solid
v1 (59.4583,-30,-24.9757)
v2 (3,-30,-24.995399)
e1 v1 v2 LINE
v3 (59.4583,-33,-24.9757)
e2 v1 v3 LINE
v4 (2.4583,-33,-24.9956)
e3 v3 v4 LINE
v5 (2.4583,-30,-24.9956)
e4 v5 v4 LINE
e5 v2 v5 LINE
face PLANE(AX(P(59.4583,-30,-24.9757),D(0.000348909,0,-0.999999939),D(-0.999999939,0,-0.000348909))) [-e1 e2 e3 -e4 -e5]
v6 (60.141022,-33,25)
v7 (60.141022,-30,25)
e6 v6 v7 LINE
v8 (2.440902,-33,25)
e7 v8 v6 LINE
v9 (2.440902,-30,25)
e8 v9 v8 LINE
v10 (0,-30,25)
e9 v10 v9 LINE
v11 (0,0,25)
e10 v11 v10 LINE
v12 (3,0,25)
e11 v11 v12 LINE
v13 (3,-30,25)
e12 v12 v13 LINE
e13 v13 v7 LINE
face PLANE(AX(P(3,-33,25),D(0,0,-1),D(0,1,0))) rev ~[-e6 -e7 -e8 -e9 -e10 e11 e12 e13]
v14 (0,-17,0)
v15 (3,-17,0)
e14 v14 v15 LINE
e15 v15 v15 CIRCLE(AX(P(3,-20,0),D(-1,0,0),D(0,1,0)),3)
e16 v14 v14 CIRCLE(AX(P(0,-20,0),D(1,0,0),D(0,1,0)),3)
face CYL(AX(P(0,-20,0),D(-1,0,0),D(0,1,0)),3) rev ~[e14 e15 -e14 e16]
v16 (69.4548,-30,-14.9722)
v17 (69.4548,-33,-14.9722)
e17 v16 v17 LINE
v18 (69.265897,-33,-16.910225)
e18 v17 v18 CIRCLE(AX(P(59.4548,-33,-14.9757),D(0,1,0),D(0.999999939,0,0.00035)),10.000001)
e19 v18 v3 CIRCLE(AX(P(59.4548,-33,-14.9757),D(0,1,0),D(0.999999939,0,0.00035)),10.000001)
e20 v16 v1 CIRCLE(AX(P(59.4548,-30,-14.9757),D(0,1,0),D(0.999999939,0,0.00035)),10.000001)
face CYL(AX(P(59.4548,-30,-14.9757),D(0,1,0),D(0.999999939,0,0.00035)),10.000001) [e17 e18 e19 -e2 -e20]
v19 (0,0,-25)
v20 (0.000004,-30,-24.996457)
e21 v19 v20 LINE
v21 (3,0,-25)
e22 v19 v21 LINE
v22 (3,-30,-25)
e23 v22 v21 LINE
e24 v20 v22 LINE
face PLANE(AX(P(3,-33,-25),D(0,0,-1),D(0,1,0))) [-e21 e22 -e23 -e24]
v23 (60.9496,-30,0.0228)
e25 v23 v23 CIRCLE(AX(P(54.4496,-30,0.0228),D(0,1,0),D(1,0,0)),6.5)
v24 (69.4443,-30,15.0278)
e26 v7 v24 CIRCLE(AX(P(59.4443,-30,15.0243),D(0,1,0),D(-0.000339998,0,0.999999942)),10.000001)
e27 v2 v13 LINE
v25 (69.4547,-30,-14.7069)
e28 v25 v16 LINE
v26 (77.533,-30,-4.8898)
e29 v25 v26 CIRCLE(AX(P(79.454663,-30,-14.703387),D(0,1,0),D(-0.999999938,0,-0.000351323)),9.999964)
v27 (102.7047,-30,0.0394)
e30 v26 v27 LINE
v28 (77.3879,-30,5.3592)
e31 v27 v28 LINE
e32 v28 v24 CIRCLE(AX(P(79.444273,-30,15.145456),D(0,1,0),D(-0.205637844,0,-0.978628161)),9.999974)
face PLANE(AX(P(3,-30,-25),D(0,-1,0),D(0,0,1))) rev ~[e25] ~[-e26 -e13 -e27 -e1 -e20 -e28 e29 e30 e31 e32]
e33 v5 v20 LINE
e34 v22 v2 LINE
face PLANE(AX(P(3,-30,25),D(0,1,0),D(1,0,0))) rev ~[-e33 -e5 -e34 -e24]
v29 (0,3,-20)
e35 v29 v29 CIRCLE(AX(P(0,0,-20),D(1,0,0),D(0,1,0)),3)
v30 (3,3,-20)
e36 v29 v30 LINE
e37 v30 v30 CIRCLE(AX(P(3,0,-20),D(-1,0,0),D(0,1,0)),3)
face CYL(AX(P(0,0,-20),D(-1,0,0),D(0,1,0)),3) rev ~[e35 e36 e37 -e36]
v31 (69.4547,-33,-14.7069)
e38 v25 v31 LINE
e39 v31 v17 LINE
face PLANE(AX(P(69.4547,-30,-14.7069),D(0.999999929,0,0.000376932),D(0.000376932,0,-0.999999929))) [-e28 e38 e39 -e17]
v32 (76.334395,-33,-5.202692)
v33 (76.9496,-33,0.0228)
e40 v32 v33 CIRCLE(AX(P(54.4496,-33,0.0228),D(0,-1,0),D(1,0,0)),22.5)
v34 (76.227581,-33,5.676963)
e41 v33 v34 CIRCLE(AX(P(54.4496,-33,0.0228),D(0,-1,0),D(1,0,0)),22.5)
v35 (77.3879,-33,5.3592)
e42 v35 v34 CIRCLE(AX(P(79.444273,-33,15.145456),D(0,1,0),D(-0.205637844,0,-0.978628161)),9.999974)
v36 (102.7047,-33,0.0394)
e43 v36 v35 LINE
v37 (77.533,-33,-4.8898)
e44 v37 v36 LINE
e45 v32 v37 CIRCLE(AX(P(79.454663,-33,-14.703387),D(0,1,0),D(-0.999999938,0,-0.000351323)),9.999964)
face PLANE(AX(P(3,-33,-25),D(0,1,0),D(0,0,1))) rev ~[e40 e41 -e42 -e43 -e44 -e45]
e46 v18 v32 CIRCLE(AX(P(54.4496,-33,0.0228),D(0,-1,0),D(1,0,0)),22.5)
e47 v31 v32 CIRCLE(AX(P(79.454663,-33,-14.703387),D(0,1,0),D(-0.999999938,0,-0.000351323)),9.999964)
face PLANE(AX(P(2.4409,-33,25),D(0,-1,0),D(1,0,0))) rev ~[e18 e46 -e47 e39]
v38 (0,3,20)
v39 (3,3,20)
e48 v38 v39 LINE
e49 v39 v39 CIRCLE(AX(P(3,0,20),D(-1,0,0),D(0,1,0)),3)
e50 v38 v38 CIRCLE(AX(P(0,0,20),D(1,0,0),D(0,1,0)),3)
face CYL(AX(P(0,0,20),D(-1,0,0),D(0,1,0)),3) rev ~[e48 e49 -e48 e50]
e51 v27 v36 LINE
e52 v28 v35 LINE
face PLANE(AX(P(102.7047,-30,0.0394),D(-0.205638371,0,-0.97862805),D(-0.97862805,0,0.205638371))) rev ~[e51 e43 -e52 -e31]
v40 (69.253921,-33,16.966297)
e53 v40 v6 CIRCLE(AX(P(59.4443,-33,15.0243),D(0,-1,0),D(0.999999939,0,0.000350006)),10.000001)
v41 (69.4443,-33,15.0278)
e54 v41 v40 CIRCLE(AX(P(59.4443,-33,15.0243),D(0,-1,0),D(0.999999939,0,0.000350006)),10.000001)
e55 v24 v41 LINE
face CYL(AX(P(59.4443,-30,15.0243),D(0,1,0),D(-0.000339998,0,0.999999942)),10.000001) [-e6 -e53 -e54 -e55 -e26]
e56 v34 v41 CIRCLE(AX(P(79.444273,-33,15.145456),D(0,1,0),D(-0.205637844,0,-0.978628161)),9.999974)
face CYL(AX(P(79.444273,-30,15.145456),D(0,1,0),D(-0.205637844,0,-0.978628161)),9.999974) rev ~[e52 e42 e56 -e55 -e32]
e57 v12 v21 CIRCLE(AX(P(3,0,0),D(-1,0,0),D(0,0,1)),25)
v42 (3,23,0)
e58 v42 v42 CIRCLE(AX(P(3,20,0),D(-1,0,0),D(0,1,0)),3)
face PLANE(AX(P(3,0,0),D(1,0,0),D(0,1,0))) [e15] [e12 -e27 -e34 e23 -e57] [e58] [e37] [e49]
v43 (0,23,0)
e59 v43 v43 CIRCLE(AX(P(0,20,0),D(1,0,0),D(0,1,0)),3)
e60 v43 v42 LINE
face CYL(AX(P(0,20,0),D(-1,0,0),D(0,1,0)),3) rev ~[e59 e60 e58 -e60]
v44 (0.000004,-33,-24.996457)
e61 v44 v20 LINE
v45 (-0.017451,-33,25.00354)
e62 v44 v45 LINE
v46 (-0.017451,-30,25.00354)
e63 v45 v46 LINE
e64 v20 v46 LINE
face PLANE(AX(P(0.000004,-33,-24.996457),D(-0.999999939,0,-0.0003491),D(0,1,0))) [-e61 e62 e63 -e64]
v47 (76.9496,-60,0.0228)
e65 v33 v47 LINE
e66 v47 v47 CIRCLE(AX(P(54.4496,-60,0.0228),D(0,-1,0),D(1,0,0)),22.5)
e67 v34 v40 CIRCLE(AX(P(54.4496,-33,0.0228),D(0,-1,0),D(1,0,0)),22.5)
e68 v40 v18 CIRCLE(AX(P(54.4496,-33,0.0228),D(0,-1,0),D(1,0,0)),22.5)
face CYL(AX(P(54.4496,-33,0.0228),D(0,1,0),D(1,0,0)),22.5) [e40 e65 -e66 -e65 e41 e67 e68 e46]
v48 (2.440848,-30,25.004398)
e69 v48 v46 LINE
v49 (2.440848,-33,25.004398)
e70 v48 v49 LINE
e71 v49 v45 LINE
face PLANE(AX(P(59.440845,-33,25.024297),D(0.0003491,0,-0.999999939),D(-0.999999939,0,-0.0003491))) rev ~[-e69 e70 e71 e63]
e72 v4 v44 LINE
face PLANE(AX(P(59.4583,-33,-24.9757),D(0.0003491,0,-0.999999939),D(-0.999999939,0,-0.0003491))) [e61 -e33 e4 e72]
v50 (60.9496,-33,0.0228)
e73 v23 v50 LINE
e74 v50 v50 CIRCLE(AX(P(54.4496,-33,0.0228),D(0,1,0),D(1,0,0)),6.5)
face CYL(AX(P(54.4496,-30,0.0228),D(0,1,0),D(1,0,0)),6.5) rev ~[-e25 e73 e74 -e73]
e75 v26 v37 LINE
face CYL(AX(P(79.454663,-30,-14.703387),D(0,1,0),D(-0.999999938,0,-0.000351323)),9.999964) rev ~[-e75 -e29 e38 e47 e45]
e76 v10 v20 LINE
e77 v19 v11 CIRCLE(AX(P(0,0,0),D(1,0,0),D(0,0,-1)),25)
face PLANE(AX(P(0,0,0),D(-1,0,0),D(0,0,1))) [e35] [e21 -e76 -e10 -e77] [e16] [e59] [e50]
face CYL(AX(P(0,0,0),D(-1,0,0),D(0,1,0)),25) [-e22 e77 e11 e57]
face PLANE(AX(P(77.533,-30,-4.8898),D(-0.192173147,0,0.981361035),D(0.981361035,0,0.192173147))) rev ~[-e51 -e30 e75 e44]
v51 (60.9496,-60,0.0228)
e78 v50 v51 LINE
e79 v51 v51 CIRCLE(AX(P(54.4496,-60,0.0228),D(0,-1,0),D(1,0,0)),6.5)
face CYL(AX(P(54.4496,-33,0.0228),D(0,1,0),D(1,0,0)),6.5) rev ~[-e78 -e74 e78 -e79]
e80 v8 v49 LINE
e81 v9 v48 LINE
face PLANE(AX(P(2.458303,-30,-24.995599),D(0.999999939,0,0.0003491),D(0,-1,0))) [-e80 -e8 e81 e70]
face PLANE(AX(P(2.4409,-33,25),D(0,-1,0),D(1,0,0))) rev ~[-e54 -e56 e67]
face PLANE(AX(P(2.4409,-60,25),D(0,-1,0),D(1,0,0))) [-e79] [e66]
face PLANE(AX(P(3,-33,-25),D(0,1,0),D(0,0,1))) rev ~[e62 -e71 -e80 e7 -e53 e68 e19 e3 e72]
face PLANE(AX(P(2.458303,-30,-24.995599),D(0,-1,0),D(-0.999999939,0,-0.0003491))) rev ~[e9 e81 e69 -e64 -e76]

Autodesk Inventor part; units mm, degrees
ref_plane "YZ Plane" through (0, 0, 0) normal (1, 0, 0) x (0, 1, 0)
ref_plane "XZ Plane" through (0, 0, 0) normal (0, 1, 0) x (-1, 0, 0)
ref_plane "XY Plane" through (0, 0, 0) normal (0, 0, 1) x (1, 0, 0)
sketch "Boceto1" plane through (0, 0, 0) normal (1, 0, 0) x (0, 1, 0)
  circle A0 centre (0, 0) radius 25
  circle A1 centre (0, 0) radius 20
  circle A2 centre (20, 0) radius 3
  circle A3 centre (0, 20) radius 3
  circle A4 centre (-20, 0) radius 3
  circle A5 centre (0, -20) radius 3
  line L0 (0, 25) -> (-31.5, 25)
  line L1 (-31.5, 25) -> (-31.5, -25)
  line L2 (-31.5, -25) -> (0, -25)
  line L3 (0, -25) -> (0, 25)
  point P0 (0, -25)
  dimension "d1" = 40
  dimension "d0" = 50
  dimension "d2" = 6
  dimension "d5" = 360
  dimension "d7" = 31.5
  dimension "d8" = 0
  dimension "d9" = 50
  dimension "d10" = 25
extrude "Extrusión1" add sketch "Boceto1" along normal blind 3 contours A0 L3 A5 A1 A2 A3 | L3 A3 A1 A4 A5 A0 | A0 L2 L1 L0 | A3 L3 A5 A1 A4 | A1 A2 A5 L3 A3
sketch "Boceto2" plane through (3, 0, 0) normal (1, 0, 0) x (0, 0, -1)
  line L0 (25, -30) -> (-25, -30)
  line L1 (-25, -30) -> (-25, -33)
  line L2 (-25, -33) -> (25, -33)
  line L3 (25, -33) -> (25, -30)
  line L4 (-25, -31.5) -> (25, -31.5) projected
  point P0 (0, 0)
  dimension "d13" = 50
  dimension "d14" = 3
  dimension "d15" = 1.5
extrude "Extrusión2" add sketch "Boceto2" along normal blind 100
sketch "Boceto3" plane through (3, 0, 0) normal (-1, 0, 0) x (0, 0, 1)
  line L0 (25, -31.5) -> (-25, -31.5) projected
  line L1 (-25, -33) -> (-25, -31.5) projected
  line L2 (25, -31.5) -> (-25, -31.5)
  line L3 (-25, -31.5) -> (-25, -33)
  line L4 (-25, -33) -> (25, -33)
  line L5 (25, -33) -> (25, -31.5)
  point P0 (0, 0)
extrude "Extrusión3" add sketch "Boceto3" along normal blind 3
sketch "Boceto4" plane through (3, -30, 25) normal (0, 1, 0) x (1, 0, 0)
  line L0 (-3.5591, -0.0033) -> (56.4409, -0.0243)
  line L1 (56.4583, 49.9757) -> (-83.1198, 50.0244)
  circle A0 centre (51.4496, 24.9772) radius 6.5
  arc A1 (56.4409, -0.0243) -> (66.4443, 9.9722) centre (56.4443, 9.9757) ccw
  arc A2 (66.4548, 39.9722) -> (56.4583, 49.9757) centre (56.4548, 39.9757) ccw
  line L2 (-3.5591, -0.0033) -> (-0.5591, -0.0044)
  line L3 (-0.5591, -0.0044) -> (-0.5417, 49.9956)
  line L4 (-0.5417, 49.9956) -> (-3.5417, 49.9967)
  line L5 (-3.5581, 2.9967) -> (-0.5581, 2.9956)
  line L6 (-3.557, 5.9967) -> (-0.557, 5.9956)
  line L7 (-3.556, 8.9967) -> (-0.556, 8.9956)
  line L8 (-3.555, 11.9967) -> (-0.555, 11.9956)
  line L9 (-3.5539, 14.9967) -> (-0.5539, 14.9956)
  line L10 (-3.5529, 17.9967) -> (-0.5529, 17.9956)
  line L11 (-3.5518, 20.9967) -> (-0.5518, 20.9956)
  line L12 (-3.5508, 23.9967) -> (-0.5508, 23.9956)
  line L13 (-3.5497, 26.9967) -> (-0.5497, 26.9956)
  line L14 (-3.5487, 29.9967) -> (-0.5487, 29.9956)
  line L15 (-3.5476, 32.9967) -> (-0.5476, 32.9956)
  line L16 (-3.5466, 35.9967) -> (-0.5466, 35.9956)
  line L17 (-3.5455, 38.9967) -> (-0.5455, 38.9956)
  line L18 (-3.5445, 41.9967) -> (-0.5445, 41.9956)
  line L19 (-3.5434, 44.9967) -> (-0.5434, 44.9956)
  line L20 (-3.5424, 47.9967) -> (-0.5424, 47.9956)
  line L21 (-3.5413, 50.9967) -> (-0.5413, 50.9956)
  line L22 (-3.5403, 53.9967) -> (-0.5403, 53.9956)
  line L23 (-3.5392, 56.9967) -> (-0.5392, 56.9956)
  line L24 (-3.5382, 59.9967) -> (-0.5382, 59.9956)
  line L25 (74.533, 29.8898) -> (99.7047, 24.9606)
  line L26 (99.7047, 24.9606) -> (74.3879, 19.6408)
  line L27 (66.4443, 9.9722) -> (66.4443, 9.858)
  line L28 (66.4547, 39.7069) -> (66.4548, 39.9722)
  arc A3 (74.3879, 19.6408) -> (66.4443, 9.858) centre (76.4443, 9.8545) ccw
  arc A4 (66.4547, 39.7069) -> (74.533, 29.8898) centre (76.4547, 39.7034) ccw
  line L29 (0, 50) -> (100, 50) projected
  line L30 (0, 0) -> (100, 0) projected
  circle A5 centre (51.4496, 24.9772) radius 79.9654
  point P0 (-3, 25)
  point P1 (-13.1198, 50)
  point P2 (66.4518, 31.4722)
  point P3 (66.4471, 17.9722)
  dimension "d24" = 70
  dimension "d25" = 13
  dimension "d26" = 10
  dimension "d27" = 3
  dimension "d28" = 3
  dimension "d29" = 7.005
  dimension "d30" = 6.495
  dimension "d31" = 10
  dimension "d33" = 0
  dimension "d34" = 179.98
extrude "Extrusión4" cut sketch "Boceto4" against normal blind 3
sketch "Boceto6" plane through (59.4583, -33, -24.9757) normal (0.0003491, 0, -0.9999999) x (-0.9999999, 0, -0.0003491)
  line L0 (57, 0) -> (-0.7, 0) projected
  line L1 (56.4583, 3) -> (59.4583, 3) projected
  line L2 (57, 0) -> (59.4583, 0)
  line L3 (59.4583, 0) -> (59.4583, 3)
  line L4 (59.4583, 3) -> (57, 3)
  line L5 (57, 3) -> (57, 0)
  point P0 (59.4496, 33)
extrude "Extrusión5" add sketch "Boceto6" against normal blind 50
sketch "Boceto7" plane through (2.4409, -33, 25) normal (0, -1, 0) x (1, 0, 0)
  circle A0 centre (52.0087, -24.9772) radius 6.5 projected
  circle A1 centre (52.0087, -24.9772) radius 22.5
  point P0 (-2.4409, -25)
  dimension "d39" = 45
extrude "Extrusión6" add sketch "Boceto7" along normal blind 27
properties part number "Herramienta"
